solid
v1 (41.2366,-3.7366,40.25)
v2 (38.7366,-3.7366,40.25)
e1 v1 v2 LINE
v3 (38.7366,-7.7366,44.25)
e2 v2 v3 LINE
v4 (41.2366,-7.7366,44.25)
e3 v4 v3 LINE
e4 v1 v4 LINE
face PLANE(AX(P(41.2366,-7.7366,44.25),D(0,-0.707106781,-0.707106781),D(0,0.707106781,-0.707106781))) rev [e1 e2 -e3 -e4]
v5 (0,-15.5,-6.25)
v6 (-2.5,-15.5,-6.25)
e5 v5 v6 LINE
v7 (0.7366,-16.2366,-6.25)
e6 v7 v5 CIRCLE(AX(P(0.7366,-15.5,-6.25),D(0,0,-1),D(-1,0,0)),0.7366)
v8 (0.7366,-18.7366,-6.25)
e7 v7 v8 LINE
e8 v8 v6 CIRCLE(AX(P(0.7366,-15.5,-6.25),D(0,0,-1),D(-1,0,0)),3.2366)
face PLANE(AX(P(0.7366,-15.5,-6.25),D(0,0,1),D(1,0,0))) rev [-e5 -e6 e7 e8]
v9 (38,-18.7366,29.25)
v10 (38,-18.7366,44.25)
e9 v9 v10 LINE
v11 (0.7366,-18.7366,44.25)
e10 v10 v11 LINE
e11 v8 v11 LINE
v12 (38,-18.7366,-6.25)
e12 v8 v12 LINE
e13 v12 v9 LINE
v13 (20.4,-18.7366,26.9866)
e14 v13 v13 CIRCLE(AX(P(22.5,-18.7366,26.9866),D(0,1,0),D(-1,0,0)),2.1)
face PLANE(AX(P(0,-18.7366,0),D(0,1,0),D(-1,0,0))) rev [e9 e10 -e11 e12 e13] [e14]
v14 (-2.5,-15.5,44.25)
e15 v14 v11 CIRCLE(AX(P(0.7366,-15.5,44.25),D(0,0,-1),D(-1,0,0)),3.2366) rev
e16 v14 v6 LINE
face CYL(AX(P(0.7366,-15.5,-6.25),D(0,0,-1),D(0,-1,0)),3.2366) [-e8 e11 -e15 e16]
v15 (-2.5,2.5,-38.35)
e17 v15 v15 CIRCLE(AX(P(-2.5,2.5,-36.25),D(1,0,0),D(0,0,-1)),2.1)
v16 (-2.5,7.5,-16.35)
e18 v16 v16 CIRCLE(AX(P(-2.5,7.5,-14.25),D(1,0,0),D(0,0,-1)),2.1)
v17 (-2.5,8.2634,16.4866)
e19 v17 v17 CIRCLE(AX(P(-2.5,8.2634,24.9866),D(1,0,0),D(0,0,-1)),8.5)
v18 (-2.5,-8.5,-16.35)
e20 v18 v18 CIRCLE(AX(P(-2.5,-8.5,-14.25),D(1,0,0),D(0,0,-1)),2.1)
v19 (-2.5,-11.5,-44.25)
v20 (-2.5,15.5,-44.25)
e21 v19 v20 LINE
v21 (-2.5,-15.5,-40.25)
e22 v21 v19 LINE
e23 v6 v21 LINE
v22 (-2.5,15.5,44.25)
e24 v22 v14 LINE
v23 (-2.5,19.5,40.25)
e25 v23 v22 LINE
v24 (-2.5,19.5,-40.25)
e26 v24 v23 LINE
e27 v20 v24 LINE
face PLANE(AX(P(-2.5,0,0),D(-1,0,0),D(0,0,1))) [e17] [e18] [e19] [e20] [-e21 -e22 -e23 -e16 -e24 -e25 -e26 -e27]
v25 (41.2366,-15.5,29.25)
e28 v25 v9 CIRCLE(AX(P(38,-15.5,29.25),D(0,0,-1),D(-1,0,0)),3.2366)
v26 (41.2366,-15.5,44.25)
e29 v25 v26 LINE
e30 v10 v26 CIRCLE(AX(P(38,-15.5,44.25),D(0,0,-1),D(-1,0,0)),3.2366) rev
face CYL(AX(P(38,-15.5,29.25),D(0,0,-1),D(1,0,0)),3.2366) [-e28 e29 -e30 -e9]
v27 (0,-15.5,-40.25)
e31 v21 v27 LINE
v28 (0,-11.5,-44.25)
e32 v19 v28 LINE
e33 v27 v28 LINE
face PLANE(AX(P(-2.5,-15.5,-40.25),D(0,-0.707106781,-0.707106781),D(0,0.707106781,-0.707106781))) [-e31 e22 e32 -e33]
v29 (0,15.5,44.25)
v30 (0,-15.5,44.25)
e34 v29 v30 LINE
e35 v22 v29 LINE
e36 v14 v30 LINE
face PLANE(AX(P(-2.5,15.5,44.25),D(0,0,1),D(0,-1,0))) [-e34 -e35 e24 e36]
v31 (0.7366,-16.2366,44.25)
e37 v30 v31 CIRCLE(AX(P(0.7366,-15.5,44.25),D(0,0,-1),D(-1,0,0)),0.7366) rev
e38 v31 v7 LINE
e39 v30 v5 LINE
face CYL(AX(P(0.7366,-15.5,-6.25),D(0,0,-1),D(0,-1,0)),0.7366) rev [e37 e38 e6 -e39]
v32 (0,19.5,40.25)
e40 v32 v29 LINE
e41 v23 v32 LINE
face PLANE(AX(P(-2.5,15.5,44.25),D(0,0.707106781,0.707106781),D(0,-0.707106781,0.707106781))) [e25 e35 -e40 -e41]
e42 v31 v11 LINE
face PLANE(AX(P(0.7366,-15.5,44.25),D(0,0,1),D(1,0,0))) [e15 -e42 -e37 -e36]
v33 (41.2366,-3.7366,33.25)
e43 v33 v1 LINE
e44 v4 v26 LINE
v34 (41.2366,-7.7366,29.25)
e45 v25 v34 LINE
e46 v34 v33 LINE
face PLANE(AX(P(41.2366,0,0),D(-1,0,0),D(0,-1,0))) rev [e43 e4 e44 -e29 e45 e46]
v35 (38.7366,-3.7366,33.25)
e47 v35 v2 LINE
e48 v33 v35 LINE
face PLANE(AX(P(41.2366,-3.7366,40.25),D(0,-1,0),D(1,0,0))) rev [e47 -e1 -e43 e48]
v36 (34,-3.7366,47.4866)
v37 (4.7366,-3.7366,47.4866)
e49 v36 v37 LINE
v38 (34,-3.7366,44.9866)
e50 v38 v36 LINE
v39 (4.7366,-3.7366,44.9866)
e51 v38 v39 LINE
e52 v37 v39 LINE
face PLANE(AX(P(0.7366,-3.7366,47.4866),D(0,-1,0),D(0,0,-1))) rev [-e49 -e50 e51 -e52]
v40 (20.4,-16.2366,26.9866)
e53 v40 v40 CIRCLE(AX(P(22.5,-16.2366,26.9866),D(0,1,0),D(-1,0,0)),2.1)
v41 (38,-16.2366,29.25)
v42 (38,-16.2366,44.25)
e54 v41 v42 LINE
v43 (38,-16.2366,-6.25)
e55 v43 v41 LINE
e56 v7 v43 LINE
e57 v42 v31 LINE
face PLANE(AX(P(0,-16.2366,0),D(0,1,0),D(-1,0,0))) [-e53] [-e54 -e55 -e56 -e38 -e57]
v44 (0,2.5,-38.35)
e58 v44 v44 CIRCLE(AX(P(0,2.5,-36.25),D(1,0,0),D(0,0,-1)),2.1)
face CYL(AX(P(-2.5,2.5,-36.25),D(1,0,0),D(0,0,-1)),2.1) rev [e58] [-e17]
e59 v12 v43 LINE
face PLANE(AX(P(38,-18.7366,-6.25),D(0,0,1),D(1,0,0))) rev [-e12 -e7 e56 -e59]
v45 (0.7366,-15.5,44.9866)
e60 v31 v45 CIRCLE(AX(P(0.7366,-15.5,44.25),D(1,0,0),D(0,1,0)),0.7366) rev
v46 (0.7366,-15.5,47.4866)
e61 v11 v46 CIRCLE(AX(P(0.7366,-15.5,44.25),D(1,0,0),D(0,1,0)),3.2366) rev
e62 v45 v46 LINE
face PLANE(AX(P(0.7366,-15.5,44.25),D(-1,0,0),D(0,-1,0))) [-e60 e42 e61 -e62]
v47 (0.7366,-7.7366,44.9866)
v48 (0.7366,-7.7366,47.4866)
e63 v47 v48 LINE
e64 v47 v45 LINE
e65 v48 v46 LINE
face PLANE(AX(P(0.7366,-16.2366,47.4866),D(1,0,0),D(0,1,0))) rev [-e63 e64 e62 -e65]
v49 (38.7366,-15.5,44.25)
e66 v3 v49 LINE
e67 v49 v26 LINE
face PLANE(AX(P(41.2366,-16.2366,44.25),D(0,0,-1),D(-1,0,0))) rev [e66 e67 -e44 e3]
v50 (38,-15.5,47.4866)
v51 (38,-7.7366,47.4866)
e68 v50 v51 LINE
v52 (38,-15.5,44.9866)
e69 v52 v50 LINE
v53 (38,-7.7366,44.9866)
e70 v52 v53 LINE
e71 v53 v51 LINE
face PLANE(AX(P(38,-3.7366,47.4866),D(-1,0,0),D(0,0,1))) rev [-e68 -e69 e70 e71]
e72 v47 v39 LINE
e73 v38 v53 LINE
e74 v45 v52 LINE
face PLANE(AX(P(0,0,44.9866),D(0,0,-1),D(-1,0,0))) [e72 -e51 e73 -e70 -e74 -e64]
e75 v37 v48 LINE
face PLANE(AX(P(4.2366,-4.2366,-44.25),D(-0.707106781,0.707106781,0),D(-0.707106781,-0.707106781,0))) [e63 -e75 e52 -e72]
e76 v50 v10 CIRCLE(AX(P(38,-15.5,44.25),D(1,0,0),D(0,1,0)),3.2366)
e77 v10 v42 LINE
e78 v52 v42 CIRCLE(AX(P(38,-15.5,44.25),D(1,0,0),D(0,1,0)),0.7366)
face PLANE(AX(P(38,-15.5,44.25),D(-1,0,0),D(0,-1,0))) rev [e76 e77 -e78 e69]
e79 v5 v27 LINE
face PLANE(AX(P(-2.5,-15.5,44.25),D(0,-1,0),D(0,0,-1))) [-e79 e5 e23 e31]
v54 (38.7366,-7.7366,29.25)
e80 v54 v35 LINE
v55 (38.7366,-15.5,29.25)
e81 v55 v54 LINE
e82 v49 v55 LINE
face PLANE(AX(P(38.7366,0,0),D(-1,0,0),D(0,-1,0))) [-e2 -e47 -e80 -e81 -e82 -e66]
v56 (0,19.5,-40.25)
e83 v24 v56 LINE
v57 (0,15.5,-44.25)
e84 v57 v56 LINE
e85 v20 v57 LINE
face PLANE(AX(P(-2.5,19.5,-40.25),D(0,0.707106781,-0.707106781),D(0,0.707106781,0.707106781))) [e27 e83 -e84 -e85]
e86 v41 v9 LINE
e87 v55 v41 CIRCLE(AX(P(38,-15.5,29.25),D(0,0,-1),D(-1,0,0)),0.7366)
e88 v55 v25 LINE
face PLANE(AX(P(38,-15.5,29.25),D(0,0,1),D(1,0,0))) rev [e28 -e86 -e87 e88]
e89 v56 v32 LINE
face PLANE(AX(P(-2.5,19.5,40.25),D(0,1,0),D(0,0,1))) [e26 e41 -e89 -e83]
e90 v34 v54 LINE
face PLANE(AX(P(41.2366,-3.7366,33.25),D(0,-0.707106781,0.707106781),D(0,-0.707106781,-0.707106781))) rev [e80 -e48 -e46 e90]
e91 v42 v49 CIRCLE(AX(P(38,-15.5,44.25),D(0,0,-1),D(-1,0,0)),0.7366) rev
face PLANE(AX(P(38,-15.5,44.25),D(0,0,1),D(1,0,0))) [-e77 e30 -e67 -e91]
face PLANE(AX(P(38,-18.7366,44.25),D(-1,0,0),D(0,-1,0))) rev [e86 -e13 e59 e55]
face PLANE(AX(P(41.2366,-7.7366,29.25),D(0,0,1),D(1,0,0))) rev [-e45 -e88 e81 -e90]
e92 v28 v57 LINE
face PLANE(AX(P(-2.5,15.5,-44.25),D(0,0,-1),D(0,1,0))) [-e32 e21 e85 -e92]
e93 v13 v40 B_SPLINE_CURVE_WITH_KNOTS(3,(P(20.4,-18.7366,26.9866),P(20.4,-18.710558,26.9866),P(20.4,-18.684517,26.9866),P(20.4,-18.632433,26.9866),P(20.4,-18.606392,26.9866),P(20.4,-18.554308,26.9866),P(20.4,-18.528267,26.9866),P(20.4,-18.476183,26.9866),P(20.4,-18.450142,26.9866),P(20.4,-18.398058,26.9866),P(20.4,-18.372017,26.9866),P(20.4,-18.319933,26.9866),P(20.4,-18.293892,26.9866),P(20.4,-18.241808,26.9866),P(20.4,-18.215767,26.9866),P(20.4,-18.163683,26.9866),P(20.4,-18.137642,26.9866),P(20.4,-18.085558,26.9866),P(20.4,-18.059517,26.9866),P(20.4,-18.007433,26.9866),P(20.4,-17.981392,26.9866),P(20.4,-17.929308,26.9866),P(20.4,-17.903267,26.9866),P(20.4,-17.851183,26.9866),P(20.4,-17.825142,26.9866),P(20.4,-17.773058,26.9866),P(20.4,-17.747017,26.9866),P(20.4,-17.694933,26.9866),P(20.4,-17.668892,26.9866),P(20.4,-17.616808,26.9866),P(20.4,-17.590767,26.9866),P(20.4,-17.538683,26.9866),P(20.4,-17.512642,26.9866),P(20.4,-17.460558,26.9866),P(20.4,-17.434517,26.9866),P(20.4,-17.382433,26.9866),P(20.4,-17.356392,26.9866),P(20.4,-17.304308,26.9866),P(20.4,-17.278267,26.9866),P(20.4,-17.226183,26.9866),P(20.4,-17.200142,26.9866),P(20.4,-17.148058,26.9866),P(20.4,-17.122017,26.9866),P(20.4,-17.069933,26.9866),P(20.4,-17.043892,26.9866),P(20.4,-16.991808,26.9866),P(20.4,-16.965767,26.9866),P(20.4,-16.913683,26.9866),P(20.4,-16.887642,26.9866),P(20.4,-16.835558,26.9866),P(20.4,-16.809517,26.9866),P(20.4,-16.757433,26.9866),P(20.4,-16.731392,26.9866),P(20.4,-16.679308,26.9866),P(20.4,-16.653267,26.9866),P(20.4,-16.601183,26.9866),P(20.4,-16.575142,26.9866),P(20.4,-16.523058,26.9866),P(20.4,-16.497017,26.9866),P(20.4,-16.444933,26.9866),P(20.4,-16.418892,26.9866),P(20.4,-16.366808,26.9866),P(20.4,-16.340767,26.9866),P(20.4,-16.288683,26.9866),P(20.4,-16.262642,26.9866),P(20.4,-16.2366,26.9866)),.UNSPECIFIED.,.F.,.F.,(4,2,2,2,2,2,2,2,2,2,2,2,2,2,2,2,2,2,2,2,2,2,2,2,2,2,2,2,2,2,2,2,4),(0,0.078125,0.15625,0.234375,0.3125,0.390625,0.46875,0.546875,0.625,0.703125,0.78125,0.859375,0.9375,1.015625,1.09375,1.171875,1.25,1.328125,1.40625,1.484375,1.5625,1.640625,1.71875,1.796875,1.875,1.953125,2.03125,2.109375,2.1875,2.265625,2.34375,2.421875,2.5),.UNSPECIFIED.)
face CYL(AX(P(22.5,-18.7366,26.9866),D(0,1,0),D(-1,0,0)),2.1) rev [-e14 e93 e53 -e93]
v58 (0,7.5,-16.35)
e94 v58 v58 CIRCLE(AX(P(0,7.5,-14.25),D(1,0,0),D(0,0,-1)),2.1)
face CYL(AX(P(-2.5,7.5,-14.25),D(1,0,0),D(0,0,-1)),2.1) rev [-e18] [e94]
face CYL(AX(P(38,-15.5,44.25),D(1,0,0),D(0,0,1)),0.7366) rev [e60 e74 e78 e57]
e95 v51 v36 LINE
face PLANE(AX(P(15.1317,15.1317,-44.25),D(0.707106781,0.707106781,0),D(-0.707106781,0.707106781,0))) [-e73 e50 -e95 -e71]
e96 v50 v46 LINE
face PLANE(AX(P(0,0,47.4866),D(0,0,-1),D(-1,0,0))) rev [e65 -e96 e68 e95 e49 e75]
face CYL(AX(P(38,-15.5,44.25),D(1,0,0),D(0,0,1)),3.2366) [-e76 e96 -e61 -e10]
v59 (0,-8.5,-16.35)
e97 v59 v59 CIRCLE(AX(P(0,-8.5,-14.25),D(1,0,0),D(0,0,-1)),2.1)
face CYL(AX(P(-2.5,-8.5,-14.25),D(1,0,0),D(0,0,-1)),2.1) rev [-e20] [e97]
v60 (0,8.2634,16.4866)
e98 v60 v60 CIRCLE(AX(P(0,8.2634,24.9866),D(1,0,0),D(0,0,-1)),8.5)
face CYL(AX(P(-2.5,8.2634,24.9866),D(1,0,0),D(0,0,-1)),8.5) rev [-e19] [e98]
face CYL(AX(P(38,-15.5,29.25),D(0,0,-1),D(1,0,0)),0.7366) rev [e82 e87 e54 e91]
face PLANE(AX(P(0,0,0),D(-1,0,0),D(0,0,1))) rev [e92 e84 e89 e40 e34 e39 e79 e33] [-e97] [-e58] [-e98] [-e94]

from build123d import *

# Parameters (mm, degrees)
SKETCH1_R               = 2.1
BASE_FLANGE1_DEPTH      = 2.5
EDGE_FLANGE1_DEPTH      = 50.5
EDGE_FLANGE2_DEPTH      = 15
EDGE_FLANGE2_START      = 2.5
EDGE_FLANGE2_FLAT_DEPTH = 2.5
EDGE_FLANGE3_DEPTH      = 37.2634
CUT_EXTRUDE1_DEPTH      = 103.451505402
SKETCH18_R              = 8.5
CUT_EXTRUDE2_DEPTH      = 66.845913762
SKETCH19_R              = 2.1
CUT_EXTRUDE3_DEPTH      = 73.336290606


# Sheet-metal steps are written as plain solids
with BuildPart() as part:
    # Sketch1 → Base-Flange1 (new body)
    with BuildSketch(Plane(origin=(0, 0, 0), x_dir=(0, 0, -1), z_dir=(1, 0, 0))):
        Polygon((40.25, 19.5), (44.25, 15.5), (44.25, -11.5), (40.25, -15.5), (-44.25, -15.5), (-44.25, 15.5), (-40.25, 19.5), align=None)
        with Locations((14.25, 7.5)):
            Circle(SKETCH1_R, mode=Mode.SUBTRACT)
        with Locations((14.25, -8.5)):
            Circle(SKETCH1_R, mode=Mode.SUBTRACT)
        with Locations((36.25, 2.5)):
            Circle(SKETCH1_R, mode=Mode.SUBTRACT)
    extrude(amount=-BASE_FLANGE1_DEPTH)

    # Edge-Flange1 section (across the edge) → Edge-Flange1 (add)
    with BuildSketch(Plane(origin=(0, -16.2366, 44.25), x_dir=(0, 1, 0), z_dir=(0, 0, -1))):
        with BuildLine():
            Line((-2.5, 0.7366), (-2.5, 38))
            Line((-2.5, 38), (0, 38))
            Line((0, 38), (0, 0.7366))
            ThreePointArc((0, 0.7366), (0.215745145, 0.215745145), (0.7366, 0))
            Line((0.7366, 0), (0.7366, -2.5))
            ThreePointArc((0.7366, -2.5), (-1.552021808, -1.552021808), (-2.5, 0.7366))
        make_face()
    extrude(amount=EDGE_FLANGE1_DEPTH)

    # Edge-Flange2 bend section (across the edge) → Edge-Flange2 (add)
    with BuildSketch(Plane(origin=(38.7366, -16.2366, 44.25), x_dir=(-1, 0, 0), z_dir=(0, 0, -1))):
        with BuildLine():
            Line((-2.5, 0.7366), (0, 0.7366))
            ThreePointArc((0, 0.7366), (0.215745145, 0.215745145), (0.7366, 0))
            Line((0.7366, 0), (0.7366, -2.5))
            ThreePointArc((0.7366, -2.5), (-1.552021808, -1.552021808), (-2.5, 0.7366))
        make_face()
    extrude(amount=EDGE_FLANGE2_DEPTH)

    # Edge-Flange2 profile (on flange) → Edge-Flange2 flat (add)
    with BuildSketch(Plane(origin=(38.7366, -16.2366, 0), x_dir=(0, 0, -1), z_dir=(1, 0, 0)).offset(EDGE_FLANGE2_START)):
        Polygon((-44.25, 0.7366), (-29.25, 0.7366), (-29.25, 8.5), (-33.25, 12.5), (-40.25, 12.5), (-44.25, 8.5), align=None)
    extrude(amount=-EDGE_FLANGE2_FLAT_DEPTH)

    # Edge-Flange3 section (across the edge) → Edge-Flange3 (add)
    with BuildSketch(Plane(origin=(0.7366, -16.2366, 44.9866), x_dir=(0, 0, -1), z_dir=(1, 0, 0))):
        with BuildLine():
            Line((-2.5, 0.7366), (-2.5, 12.5))
            Line((-2.5, 12.5), (0, 12.5))
            Line((0, 12.5), (0, 0.7366))
            ThreePointArc((0, 0.7366), (0.215745145, 0.215745145), (0.7366, 0))
            Line((0.7366, 0), (0.7366, -2.5))
            ThreePointArc((0.7366, -2.5), (-1.552021808, -1.552021808), (-2.5, 0.7366))
        make_face()
    extrude(amount=EDGE_FLANGE3_DEPTH)

    # Sketch17 → Cut-Extrude1 (cut, through all)
    with BuildSketch(Plane.XY.offset(47.4866)):
        Polygon((0.7366, -7.7366), (4.7366, -3.7366), (0.7366, -3.7366), align=None)
        Polygon((34, -3.7366), (38, -7.7366), (38, -3.7366), align=None)
    extrude(amount=-CUT_EXTRUDE1_DEPTH, mode=Mode.SUBTRACT)

    # Sketch18 → Cut-Extrude2 (cut, through all)
    with BuildSketch(Plane(origin=(0, 0, 0), x_dir=(0, 0, -1), z_dir=(1, 0, 0))):
        with Locations((-24.9866, 8.2634)):
            Circle(SKETCH18_R)
    extrude(amount=-CUT_EXTRUDE2_DEPTH, mode=Mode.SUBTRACT)

    # Sketch19 → Cut-Extrude3 (cut, through all)
    with BuildSketch(Plane(origin=(0, -16.2366, 0), x_dir=(1, 0, 0), z_dir=(0, 1, 0))):
        with Locations(Location((22.5, -26.9866, 0), (0, 0, 180))):
            Circle(SKETCH19_R)
    extrude(amount=-CUT_EXTRUDE3_DEPTH, mode=Mode.SUBTRACT)


solid = part.part
